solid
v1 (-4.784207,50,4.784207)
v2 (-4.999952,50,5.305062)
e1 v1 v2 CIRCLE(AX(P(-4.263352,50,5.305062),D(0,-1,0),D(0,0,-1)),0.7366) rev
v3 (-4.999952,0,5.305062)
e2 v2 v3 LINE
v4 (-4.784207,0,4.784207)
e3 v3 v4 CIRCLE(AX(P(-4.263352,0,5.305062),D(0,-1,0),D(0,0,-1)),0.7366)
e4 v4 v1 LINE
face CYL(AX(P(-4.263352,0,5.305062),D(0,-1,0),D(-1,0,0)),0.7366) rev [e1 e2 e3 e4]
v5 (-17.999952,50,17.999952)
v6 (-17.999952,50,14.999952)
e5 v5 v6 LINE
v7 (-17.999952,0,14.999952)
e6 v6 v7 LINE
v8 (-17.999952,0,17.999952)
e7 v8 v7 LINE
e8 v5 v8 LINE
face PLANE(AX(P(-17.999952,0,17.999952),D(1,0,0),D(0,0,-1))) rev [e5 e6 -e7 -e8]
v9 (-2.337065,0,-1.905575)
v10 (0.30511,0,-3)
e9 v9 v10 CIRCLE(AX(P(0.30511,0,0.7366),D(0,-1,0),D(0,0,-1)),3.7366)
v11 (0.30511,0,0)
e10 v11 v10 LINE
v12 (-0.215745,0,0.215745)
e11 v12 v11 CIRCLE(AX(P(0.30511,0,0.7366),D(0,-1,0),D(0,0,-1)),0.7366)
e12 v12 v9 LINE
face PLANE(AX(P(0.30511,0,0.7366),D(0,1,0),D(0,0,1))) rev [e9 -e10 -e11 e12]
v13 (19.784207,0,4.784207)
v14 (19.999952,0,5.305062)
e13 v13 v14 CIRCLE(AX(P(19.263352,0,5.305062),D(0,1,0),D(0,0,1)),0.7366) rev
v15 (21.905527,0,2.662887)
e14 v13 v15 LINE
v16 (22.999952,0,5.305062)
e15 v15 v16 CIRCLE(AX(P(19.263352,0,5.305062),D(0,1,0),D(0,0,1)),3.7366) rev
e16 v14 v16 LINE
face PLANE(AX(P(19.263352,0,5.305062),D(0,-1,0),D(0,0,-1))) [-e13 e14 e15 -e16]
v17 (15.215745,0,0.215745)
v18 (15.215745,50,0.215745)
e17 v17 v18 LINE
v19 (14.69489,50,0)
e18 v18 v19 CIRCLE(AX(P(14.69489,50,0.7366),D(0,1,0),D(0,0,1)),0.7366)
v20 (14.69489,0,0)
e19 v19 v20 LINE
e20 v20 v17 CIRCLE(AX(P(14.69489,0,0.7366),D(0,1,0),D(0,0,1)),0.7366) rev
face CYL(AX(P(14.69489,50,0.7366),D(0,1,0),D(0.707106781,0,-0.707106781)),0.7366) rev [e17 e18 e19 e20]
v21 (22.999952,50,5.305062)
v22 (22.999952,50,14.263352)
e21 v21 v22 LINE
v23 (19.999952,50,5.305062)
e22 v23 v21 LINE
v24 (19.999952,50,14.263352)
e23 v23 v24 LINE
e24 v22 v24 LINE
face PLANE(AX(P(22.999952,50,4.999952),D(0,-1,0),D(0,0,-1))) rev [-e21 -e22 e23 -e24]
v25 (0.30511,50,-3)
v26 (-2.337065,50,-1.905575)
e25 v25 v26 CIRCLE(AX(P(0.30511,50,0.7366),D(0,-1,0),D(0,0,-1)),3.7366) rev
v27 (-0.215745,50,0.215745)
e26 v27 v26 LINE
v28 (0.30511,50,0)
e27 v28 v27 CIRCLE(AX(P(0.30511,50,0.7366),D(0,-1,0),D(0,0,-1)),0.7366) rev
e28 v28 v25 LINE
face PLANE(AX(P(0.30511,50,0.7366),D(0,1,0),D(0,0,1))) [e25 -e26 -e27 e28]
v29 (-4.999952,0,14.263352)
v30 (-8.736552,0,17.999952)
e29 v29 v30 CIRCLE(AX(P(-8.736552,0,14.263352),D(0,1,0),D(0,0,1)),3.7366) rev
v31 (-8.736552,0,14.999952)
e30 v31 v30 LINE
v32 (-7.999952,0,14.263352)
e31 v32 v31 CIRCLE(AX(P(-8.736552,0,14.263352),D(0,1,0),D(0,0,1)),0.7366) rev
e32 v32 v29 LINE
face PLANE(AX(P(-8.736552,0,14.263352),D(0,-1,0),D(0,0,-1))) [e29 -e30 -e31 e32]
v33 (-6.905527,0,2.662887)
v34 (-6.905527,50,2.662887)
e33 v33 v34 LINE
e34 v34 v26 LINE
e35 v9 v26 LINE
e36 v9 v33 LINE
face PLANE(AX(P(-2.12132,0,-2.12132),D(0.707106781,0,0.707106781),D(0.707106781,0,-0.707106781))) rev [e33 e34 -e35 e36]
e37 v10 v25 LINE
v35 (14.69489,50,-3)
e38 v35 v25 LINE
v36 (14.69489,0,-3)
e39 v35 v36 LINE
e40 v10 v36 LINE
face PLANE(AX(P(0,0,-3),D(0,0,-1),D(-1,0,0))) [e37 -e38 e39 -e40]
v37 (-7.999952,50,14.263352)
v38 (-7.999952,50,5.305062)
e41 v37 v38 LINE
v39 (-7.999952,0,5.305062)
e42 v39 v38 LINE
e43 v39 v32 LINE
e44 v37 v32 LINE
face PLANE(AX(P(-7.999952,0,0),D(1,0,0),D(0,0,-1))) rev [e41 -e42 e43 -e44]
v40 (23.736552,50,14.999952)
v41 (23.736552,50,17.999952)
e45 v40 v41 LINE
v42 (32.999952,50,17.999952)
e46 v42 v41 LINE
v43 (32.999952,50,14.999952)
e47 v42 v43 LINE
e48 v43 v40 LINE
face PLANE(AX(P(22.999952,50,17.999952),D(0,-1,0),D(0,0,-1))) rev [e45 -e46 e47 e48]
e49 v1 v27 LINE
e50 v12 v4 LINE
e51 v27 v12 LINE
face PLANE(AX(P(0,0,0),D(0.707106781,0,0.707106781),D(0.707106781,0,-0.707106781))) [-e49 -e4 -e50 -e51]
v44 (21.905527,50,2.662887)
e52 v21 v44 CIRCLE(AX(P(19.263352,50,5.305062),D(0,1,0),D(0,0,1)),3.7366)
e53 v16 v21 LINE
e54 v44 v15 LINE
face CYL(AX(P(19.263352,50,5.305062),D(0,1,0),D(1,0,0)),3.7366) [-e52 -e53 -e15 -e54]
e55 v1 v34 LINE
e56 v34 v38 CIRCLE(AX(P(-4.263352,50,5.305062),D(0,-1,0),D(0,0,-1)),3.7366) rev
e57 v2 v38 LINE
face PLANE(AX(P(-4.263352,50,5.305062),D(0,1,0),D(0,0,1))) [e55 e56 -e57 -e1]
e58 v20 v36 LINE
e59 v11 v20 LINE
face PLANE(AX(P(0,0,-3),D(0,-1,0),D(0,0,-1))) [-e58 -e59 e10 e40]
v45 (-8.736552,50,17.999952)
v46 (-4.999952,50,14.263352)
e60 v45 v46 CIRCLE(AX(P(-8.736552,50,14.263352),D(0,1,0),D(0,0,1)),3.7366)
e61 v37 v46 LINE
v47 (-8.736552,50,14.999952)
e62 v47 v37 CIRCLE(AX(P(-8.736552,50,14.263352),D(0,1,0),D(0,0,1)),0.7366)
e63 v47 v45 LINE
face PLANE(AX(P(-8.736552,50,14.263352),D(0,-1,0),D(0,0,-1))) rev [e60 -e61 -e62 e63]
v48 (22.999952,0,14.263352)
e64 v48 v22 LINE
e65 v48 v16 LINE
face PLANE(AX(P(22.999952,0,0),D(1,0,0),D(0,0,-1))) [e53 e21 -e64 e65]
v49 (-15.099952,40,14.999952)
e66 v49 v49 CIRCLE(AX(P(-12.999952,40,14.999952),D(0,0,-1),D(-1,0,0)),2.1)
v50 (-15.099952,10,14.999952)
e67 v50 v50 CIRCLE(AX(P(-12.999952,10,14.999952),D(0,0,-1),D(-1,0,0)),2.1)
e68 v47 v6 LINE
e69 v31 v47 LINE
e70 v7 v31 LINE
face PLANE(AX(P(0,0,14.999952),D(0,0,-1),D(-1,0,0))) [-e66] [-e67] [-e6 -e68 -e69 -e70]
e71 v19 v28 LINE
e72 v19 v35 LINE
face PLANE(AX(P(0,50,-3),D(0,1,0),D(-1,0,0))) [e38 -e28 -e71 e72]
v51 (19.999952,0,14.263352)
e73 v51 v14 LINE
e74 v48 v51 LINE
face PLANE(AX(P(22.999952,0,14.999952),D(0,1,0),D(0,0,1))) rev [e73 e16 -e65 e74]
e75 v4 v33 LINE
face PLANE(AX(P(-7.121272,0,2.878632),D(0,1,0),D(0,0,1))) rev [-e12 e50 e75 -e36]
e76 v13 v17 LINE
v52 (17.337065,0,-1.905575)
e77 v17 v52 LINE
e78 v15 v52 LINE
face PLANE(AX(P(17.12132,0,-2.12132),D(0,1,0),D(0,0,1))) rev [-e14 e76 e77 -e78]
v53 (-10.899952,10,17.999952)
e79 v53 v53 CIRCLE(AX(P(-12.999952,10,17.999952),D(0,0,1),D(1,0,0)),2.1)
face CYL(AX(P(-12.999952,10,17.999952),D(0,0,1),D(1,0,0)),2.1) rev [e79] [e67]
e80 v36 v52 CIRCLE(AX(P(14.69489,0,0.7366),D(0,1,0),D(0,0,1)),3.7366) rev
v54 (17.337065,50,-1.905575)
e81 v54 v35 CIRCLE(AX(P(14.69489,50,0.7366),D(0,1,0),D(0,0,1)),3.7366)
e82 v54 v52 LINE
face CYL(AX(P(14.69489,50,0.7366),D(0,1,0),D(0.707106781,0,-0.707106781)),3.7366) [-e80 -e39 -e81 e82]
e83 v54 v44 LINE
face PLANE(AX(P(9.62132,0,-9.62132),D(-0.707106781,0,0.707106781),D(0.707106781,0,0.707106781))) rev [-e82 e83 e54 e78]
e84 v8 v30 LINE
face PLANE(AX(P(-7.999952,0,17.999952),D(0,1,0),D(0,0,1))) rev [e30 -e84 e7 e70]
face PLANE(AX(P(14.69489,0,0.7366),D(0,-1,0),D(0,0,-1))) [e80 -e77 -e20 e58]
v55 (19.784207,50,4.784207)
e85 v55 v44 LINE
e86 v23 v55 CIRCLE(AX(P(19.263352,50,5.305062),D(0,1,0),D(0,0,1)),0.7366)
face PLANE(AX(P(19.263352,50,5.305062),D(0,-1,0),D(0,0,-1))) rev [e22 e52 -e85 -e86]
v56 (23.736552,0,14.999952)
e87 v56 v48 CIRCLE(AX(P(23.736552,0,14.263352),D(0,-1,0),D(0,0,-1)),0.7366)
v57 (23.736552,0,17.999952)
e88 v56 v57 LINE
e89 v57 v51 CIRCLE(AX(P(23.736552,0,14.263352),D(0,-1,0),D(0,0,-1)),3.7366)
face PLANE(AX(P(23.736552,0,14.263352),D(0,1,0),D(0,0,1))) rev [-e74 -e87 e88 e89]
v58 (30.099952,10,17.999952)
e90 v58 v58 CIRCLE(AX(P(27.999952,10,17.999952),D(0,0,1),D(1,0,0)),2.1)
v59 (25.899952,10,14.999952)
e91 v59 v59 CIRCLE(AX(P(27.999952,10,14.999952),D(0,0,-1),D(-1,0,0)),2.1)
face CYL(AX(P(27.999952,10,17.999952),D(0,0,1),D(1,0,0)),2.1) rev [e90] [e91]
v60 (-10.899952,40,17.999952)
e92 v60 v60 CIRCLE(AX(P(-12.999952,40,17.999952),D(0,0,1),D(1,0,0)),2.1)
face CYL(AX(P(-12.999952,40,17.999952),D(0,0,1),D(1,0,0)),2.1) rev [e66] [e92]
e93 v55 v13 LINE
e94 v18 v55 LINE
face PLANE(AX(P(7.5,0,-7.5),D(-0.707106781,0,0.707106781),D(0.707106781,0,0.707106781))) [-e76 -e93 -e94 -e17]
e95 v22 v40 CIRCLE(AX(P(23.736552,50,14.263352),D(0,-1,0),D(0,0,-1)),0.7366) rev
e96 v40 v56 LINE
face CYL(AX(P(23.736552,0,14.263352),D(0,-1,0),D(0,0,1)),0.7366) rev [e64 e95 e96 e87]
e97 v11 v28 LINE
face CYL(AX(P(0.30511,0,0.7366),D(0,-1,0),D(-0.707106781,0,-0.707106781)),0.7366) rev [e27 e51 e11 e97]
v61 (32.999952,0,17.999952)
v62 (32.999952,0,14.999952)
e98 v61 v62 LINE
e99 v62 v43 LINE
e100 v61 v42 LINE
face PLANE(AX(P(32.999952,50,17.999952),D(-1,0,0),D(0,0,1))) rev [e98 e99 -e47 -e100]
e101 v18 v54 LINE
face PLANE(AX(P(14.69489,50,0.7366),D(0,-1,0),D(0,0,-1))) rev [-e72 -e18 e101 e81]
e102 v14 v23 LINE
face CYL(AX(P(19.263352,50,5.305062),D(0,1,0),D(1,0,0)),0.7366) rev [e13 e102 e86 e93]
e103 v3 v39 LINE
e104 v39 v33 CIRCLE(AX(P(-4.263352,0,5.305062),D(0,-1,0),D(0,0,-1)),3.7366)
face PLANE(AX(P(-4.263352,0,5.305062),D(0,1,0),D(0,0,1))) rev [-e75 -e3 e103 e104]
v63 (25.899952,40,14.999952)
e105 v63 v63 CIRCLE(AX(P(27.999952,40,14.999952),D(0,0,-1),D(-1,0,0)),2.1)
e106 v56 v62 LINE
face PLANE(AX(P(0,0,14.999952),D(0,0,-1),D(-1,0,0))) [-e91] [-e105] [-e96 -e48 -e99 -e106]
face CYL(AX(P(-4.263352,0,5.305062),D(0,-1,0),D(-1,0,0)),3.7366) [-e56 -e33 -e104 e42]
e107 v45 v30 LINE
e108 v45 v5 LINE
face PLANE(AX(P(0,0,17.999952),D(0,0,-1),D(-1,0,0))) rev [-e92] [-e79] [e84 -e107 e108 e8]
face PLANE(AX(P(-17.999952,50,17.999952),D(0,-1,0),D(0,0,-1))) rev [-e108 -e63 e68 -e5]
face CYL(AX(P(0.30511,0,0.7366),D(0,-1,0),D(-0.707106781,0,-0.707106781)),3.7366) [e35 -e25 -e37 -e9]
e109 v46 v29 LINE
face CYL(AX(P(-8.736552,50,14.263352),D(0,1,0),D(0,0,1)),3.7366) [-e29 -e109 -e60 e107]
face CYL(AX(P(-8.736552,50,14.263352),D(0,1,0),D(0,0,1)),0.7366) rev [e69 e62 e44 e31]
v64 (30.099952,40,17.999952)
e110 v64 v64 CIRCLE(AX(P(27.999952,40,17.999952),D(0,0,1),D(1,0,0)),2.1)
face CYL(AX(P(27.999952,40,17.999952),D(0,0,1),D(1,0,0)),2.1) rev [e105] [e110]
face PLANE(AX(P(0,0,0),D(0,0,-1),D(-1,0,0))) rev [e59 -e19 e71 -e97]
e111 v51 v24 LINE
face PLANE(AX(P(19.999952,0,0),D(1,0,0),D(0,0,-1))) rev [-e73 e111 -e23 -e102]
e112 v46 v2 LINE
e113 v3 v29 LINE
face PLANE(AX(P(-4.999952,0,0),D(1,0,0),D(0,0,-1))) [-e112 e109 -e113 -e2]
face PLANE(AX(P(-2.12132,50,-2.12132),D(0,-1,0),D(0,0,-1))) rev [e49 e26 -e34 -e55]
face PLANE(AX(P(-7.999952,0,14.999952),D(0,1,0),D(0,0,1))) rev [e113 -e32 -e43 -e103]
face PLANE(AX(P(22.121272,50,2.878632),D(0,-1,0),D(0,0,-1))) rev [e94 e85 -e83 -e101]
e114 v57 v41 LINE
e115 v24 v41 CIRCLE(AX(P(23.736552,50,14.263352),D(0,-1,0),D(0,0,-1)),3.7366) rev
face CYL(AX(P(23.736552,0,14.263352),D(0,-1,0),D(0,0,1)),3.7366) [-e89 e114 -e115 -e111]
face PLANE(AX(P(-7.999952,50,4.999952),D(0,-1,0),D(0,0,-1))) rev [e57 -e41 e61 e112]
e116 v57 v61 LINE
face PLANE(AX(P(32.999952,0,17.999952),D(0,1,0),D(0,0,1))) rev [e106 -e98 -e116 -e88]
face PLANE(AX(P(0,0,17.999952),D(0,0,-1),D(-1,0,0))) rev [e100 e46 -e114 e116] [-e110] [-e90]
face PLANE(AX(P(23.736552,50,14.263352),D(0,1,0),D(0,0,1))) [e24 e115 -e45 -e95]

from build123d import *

# Parameters (mm, degrees)
SKETCH1_W                      = 15
SKETCH1_H                      = 50
BASE_FLANGE1_DEPTH             = 3
EDGE_FLANGE5_STRIP_CUT_DEPTH   = 50
EDGE_FLANGE5_STRIP_CUT_2_DEPTH = 50
EDGE_FLANGE5_DEPTH             = 50
EDGE_FLANGE5_BEND_DEPTH        = 50
EDGE_FLANGE6_STRIP_CUT_DEPTH   = 50
EDGE_FLANGE6_STRIP_CUT_2_DEPTH = 50
EDGE_FLANGE6_DEPTH             = 50
EDGE_FLANGE6_BEND_DEPTH        = 50
EDGE_FLANGE7_STRIP_W           = 13.4732
EDGE_FLANGE7_STRIP_H           = 3
EDGE_FLANGE7_STRIP_CUT_DEPTH   = 50
EDGE_FLANGE7_STRIP_2_W         = 13.4732
EDGE_FLANGE7_STRIP_2_H         = 3
EDGE_FLANGE7_STRIP_CUT_2_DEPTH = 50
EDGE_FLANGE7_DEPTH             = 50
EDGE_FLANGE7_BEND_DEPTH        = 50
TAP_DRILL_FOR_M5X0_8_TAP1_D    = 4.2


# Sheet-metal steps are written as plain solids
with BuildPart() as part:
    # Sketch1 → Base-Flange1 (new body)
    with BuildSketch(Plane.XY):
        with Locations((7.5, 25)):
            Rectangle(SKETCH1_W, SKETCH1_H)
    extrude(amount=-BASE_FLANGE1_DEPTH)

    # Edge-Flange5 strip (across the edge) → Edge-Flange5 strip cut (cut)
    with BuildSketch(Plane(origin=(15, 0, 0), x_dir=(-0.7071067811865438, 0, 0.7071067811865512), z_dir=(0, 1, 0))):
        Polygon((-11.432566283, 7.189925596), (-1.905575199, -2.337065489), (0.215745145, -0.215745145), (-9.311245939, 9.311245939), align=None)
    extrude(amount=EDGE_FLANGE5_STRIP_CUT_DEPTH, mode=Mode.SUBTRACT)

    # Edge-Flange5 strip 2 (across the edge) → Edge-Flange5 strip cut 2 (cut)
    with BuildSketch(Plane(origin=(0, 50, 0), x_dir=(0.7071067811865438, 0, 0.7071067811865512), z_dir=(0, -1, 0))):
        Polygon((-11.432566283, 7.189925596), (-1.905575199, -2.337065489), (0.215745145, -0.215745145), (-9.311245939, 9.311245939), align=None)
    extrude(amount=EDGE_FLANGE5_STRIP_CUT_2_DEPTH, mode=Mode.SUBTRACT)

    # Edge-Flange5 section (across the edge) → Edge-Flange5 (add)
    with BuildSketch(Plane(origin=(15, 0, 0), x_dir=(-0.7071067811865438, 0, 0.7071067811865512), z_dir=(0, 1, 0))):
        with BuildLine():
            Line((-3, 0.30510971), (-3, 7.071))
            Line((-3, 7.071), (0, 7.071))
            Line((0, 7.071), (0, 0.30510971))
            ThreePointArc((0, 0.30510971), (0.056070336, 0.023225094), (0.215745145, -0.215745145))
            Line((0.215745145, -0.215745145), (-1.905575199, -2.337065489))
            ThreePointArc((-1.905575199, -2.337065489), (-2.715568261, -1.124825203), (-3, 0.30510971))
        make_face()
    extrude(amount=EDGE_FLANGE5_DEPTH)

    # Edge-Flange5 section 2 (across the edge) → Edge-Flange5 bend (add)
    with BuildSketch(Plane(origin=(0, 50, 0), x_dir=(0.7071067811865438, 0, 0.7071067811865512), z_dir=(0, -1, 0))):
        with BuildLine():
            Line((-3, 0.30510971), (-3, 7.071))
            Line((-3, 7.071), (0, 7.071))
            Line((0, 7.071), (0, 0.30510971))
            ThreePointArc((0, 0.30510971), (0.056070336, 0.023225094), (0.215745145, -0.215745145))
            Line((0.215745145, -0.215745145), (-1.905575199, -2.337065489))
            ThreePointArc((-1.905575199, -2.337065489), (-2.715568261, -1.124825203), (-3, 0.30510971))
        make_face()
    extrude(amount=EDGE_FLANGE5_BEND_DEPTH)

    # Edge-Flange6 strip (across the edge) → Edge-Flange6 strip cut (cut)
    with BuildSketch(Plane(origin=(-4.99995205, 50, 4.99995205), x_dir=(1, 0, 0), z_dir=(0, -1, 0))):
        Polygon((-11.432566283, 7.189925596), (-1.905575199, -2.337065489), (0.215745145, -0.215745145), (-9.311245939, 9.311245939), align=None)
    extrude(amount=EDGE_FLANGE6_STRIP_CUT_DEPTH, mode=Mode.SUBTRACT)

    # Edge-Flange6 strip 2 (across the edge) → Edge-Flange6 strip cut 2 (cut)
    with BuildSketch(Plane(origin=(19.99995205, 0, 4.99995205), x_dir=(-1, 0, 0), z_dir=(0, 1, 0))):
        Polygon((-11.432566283, 7.189925596), (-1.905575199, -2.337065489), (0.215745145, -0.215745145), (-9.311245939, 9.311245939), align=None)
    extrude(amount=EDGE_FLANGE6_STRIP_CUT_2_DEPTH, mode=Mode.SUBTRACT)

    # Edge-Flange6 section (across the edge) → Edge-Flange6 (add)
    with BuildSketch(Plane(origin=(-4.99995205, 50, 4.99995205), x_dir=(1, 0, 0), z_dir=(0, -1, 0))):
        with BuildLine():
            Line((-3, 0.30510971), (-3, 10))
            Line((-3, 10), (0, 10))
            Line((0, 10), (0, 0.30510971))
            ThreePointArc((0, 0.30510971), (0.056070336, 0.023225094), (0.215745145, -0.215745145))
            Line((0.215745145, -0.215745145), (-1.905575199, -2.337065489))
            ThreePointArc((-1.905575199, -2.337065489), (-2.715568261, -1.124825203), (-3, 0.30510971))
        make_face()
    extrude(amount=EDGE_FLANGE6_DEPTH)

    # Edge-Flange6 section 2 (across the edge) → Edge-Flange6 bend (add)
    with BuildSketch(Plane(origin=(19.99995205, 0, 4.99995205), x_dir=(-1, 0, 0), z_dir=(0, 1, 0))):
        with BuildLine():
            Line((-3, 0.30510971), (-3, 10))
            Line((-3, 10), (0, 10))
            Line((0, 10), (0, 0.30510971))
            ThreePointArc((0, 0.30510971), (0.056070336, 0.023225094), (0.215745145, -0.215745145))
            Line((0.215745145, -0.215745145), (-1.905575199, -2.337065489))
            ThreePointArc((-1.905575199, -2.337065489), (-2.715568261, -1.124825203), (-3, 0.30510971))
        make_face()
    extrude(amount=EDGE_FLANGE6_BEND_DEPTH)

    # Edge-Flange7 strip (across the edge) → Edge-Flange7 strip cut (cut)
    with BuildSketch(Plane(origin=(-7.99995205, 0, 14.99995205), x_dir=(0, 0, -1), z_dir=(0, 1, 0))):
        with Locations((-6, -1.5)):
            Rectangle(EDGE_FLANGE7_STRIP_W, EDGE_FLANGE7_STRIP_H)
    extrude(amount=EDGE_FLANGE7_STRIP_CUT_DEPTH, mode=Mode.SUBTRACT)

    # Edge-Flange7 strip 2 (across the edge) → Edge-Flange7 strip cut 2 (cut)
    with BuildSketch(Plane(origin=(22.99995205, 50, 14.99995205), x_dir=(0, 0, -1), z_dir=(0, -1, 0))):
        with Locations((-6, -1.5)):
            Rectangle(EDGE_FLANGE7_STRIP_2_W, EDGE_FLANGE7_STRIP_2_H)
    extrude(amount=EDGE_FLANGE7_STRIP_CUT_2_DEPTH, mode=Mode.SUBTRACT)

    # Edge-Flange7 section (across the edge) → Edge-Flange7 (add)
    with BuildSketch(Plane(origin=(-7.99995205, 0, 14.99995205), x_dir=(0, 0, -1), z_dir=(0, 1, 0))):
        with BuildLine():
            Line((-3, 0.7366), (-3, 10))
            Line((-3, 10), (0, 10))
            Line((0, 10), (0, 0.7366))
            ThreePointArc((0, 0.7366), (0.215745145, 0.215745145), (0.7366, 0))
            Line((0.7366, 0), (0.7366, -3))
            ThreePointArc((0.7366, -3), (-1.905575199, -1.905575199), (-3, 0.7366))
        make_face()
    extrude(amount=EDGE_FLANGE7_DEPTH)

    # Edge-Flange7 section 2 (across the edge) → Edge-Flange7 bend (add)
    with BuildSketch(Plane(origin=(22.99995205, 50, 14.99995205), x_dir=(0, 0, -1), z_dir=(0, -1, 0))):
        with BuildLine():
            Line((-3, 0.7366), (-3, 10))
            Line((-3, 10), (0, 10))
            Line((0, 10), (0, 0.7366))
            ThreePointArc((0, 0.7366), (0.215745145, 0.215745145), (0.7366, 0))
            Line((0.7366, 0), (0.7366, -3))
            ThreePointArc((0.7366, -3), (-1.905575199, -1.905575199), (-3, 0.7366))
        make_face()
    extrude(amount=EDGE_FLANGE7_BEND_DEPTH)

    # Tap Drill for M5x0.8 Tap1 (through all)
    with Locations(Plane.XY.offset(17.99995205)):
        with Locations((-12.99995205, 10), (-12.99995205, 40), (27.99995205, 10), (27.99995205, 40)):
            Hole(TAP_DRILL_FOR_M5X0_8_TAP1_D / 2)


solid = part.part
